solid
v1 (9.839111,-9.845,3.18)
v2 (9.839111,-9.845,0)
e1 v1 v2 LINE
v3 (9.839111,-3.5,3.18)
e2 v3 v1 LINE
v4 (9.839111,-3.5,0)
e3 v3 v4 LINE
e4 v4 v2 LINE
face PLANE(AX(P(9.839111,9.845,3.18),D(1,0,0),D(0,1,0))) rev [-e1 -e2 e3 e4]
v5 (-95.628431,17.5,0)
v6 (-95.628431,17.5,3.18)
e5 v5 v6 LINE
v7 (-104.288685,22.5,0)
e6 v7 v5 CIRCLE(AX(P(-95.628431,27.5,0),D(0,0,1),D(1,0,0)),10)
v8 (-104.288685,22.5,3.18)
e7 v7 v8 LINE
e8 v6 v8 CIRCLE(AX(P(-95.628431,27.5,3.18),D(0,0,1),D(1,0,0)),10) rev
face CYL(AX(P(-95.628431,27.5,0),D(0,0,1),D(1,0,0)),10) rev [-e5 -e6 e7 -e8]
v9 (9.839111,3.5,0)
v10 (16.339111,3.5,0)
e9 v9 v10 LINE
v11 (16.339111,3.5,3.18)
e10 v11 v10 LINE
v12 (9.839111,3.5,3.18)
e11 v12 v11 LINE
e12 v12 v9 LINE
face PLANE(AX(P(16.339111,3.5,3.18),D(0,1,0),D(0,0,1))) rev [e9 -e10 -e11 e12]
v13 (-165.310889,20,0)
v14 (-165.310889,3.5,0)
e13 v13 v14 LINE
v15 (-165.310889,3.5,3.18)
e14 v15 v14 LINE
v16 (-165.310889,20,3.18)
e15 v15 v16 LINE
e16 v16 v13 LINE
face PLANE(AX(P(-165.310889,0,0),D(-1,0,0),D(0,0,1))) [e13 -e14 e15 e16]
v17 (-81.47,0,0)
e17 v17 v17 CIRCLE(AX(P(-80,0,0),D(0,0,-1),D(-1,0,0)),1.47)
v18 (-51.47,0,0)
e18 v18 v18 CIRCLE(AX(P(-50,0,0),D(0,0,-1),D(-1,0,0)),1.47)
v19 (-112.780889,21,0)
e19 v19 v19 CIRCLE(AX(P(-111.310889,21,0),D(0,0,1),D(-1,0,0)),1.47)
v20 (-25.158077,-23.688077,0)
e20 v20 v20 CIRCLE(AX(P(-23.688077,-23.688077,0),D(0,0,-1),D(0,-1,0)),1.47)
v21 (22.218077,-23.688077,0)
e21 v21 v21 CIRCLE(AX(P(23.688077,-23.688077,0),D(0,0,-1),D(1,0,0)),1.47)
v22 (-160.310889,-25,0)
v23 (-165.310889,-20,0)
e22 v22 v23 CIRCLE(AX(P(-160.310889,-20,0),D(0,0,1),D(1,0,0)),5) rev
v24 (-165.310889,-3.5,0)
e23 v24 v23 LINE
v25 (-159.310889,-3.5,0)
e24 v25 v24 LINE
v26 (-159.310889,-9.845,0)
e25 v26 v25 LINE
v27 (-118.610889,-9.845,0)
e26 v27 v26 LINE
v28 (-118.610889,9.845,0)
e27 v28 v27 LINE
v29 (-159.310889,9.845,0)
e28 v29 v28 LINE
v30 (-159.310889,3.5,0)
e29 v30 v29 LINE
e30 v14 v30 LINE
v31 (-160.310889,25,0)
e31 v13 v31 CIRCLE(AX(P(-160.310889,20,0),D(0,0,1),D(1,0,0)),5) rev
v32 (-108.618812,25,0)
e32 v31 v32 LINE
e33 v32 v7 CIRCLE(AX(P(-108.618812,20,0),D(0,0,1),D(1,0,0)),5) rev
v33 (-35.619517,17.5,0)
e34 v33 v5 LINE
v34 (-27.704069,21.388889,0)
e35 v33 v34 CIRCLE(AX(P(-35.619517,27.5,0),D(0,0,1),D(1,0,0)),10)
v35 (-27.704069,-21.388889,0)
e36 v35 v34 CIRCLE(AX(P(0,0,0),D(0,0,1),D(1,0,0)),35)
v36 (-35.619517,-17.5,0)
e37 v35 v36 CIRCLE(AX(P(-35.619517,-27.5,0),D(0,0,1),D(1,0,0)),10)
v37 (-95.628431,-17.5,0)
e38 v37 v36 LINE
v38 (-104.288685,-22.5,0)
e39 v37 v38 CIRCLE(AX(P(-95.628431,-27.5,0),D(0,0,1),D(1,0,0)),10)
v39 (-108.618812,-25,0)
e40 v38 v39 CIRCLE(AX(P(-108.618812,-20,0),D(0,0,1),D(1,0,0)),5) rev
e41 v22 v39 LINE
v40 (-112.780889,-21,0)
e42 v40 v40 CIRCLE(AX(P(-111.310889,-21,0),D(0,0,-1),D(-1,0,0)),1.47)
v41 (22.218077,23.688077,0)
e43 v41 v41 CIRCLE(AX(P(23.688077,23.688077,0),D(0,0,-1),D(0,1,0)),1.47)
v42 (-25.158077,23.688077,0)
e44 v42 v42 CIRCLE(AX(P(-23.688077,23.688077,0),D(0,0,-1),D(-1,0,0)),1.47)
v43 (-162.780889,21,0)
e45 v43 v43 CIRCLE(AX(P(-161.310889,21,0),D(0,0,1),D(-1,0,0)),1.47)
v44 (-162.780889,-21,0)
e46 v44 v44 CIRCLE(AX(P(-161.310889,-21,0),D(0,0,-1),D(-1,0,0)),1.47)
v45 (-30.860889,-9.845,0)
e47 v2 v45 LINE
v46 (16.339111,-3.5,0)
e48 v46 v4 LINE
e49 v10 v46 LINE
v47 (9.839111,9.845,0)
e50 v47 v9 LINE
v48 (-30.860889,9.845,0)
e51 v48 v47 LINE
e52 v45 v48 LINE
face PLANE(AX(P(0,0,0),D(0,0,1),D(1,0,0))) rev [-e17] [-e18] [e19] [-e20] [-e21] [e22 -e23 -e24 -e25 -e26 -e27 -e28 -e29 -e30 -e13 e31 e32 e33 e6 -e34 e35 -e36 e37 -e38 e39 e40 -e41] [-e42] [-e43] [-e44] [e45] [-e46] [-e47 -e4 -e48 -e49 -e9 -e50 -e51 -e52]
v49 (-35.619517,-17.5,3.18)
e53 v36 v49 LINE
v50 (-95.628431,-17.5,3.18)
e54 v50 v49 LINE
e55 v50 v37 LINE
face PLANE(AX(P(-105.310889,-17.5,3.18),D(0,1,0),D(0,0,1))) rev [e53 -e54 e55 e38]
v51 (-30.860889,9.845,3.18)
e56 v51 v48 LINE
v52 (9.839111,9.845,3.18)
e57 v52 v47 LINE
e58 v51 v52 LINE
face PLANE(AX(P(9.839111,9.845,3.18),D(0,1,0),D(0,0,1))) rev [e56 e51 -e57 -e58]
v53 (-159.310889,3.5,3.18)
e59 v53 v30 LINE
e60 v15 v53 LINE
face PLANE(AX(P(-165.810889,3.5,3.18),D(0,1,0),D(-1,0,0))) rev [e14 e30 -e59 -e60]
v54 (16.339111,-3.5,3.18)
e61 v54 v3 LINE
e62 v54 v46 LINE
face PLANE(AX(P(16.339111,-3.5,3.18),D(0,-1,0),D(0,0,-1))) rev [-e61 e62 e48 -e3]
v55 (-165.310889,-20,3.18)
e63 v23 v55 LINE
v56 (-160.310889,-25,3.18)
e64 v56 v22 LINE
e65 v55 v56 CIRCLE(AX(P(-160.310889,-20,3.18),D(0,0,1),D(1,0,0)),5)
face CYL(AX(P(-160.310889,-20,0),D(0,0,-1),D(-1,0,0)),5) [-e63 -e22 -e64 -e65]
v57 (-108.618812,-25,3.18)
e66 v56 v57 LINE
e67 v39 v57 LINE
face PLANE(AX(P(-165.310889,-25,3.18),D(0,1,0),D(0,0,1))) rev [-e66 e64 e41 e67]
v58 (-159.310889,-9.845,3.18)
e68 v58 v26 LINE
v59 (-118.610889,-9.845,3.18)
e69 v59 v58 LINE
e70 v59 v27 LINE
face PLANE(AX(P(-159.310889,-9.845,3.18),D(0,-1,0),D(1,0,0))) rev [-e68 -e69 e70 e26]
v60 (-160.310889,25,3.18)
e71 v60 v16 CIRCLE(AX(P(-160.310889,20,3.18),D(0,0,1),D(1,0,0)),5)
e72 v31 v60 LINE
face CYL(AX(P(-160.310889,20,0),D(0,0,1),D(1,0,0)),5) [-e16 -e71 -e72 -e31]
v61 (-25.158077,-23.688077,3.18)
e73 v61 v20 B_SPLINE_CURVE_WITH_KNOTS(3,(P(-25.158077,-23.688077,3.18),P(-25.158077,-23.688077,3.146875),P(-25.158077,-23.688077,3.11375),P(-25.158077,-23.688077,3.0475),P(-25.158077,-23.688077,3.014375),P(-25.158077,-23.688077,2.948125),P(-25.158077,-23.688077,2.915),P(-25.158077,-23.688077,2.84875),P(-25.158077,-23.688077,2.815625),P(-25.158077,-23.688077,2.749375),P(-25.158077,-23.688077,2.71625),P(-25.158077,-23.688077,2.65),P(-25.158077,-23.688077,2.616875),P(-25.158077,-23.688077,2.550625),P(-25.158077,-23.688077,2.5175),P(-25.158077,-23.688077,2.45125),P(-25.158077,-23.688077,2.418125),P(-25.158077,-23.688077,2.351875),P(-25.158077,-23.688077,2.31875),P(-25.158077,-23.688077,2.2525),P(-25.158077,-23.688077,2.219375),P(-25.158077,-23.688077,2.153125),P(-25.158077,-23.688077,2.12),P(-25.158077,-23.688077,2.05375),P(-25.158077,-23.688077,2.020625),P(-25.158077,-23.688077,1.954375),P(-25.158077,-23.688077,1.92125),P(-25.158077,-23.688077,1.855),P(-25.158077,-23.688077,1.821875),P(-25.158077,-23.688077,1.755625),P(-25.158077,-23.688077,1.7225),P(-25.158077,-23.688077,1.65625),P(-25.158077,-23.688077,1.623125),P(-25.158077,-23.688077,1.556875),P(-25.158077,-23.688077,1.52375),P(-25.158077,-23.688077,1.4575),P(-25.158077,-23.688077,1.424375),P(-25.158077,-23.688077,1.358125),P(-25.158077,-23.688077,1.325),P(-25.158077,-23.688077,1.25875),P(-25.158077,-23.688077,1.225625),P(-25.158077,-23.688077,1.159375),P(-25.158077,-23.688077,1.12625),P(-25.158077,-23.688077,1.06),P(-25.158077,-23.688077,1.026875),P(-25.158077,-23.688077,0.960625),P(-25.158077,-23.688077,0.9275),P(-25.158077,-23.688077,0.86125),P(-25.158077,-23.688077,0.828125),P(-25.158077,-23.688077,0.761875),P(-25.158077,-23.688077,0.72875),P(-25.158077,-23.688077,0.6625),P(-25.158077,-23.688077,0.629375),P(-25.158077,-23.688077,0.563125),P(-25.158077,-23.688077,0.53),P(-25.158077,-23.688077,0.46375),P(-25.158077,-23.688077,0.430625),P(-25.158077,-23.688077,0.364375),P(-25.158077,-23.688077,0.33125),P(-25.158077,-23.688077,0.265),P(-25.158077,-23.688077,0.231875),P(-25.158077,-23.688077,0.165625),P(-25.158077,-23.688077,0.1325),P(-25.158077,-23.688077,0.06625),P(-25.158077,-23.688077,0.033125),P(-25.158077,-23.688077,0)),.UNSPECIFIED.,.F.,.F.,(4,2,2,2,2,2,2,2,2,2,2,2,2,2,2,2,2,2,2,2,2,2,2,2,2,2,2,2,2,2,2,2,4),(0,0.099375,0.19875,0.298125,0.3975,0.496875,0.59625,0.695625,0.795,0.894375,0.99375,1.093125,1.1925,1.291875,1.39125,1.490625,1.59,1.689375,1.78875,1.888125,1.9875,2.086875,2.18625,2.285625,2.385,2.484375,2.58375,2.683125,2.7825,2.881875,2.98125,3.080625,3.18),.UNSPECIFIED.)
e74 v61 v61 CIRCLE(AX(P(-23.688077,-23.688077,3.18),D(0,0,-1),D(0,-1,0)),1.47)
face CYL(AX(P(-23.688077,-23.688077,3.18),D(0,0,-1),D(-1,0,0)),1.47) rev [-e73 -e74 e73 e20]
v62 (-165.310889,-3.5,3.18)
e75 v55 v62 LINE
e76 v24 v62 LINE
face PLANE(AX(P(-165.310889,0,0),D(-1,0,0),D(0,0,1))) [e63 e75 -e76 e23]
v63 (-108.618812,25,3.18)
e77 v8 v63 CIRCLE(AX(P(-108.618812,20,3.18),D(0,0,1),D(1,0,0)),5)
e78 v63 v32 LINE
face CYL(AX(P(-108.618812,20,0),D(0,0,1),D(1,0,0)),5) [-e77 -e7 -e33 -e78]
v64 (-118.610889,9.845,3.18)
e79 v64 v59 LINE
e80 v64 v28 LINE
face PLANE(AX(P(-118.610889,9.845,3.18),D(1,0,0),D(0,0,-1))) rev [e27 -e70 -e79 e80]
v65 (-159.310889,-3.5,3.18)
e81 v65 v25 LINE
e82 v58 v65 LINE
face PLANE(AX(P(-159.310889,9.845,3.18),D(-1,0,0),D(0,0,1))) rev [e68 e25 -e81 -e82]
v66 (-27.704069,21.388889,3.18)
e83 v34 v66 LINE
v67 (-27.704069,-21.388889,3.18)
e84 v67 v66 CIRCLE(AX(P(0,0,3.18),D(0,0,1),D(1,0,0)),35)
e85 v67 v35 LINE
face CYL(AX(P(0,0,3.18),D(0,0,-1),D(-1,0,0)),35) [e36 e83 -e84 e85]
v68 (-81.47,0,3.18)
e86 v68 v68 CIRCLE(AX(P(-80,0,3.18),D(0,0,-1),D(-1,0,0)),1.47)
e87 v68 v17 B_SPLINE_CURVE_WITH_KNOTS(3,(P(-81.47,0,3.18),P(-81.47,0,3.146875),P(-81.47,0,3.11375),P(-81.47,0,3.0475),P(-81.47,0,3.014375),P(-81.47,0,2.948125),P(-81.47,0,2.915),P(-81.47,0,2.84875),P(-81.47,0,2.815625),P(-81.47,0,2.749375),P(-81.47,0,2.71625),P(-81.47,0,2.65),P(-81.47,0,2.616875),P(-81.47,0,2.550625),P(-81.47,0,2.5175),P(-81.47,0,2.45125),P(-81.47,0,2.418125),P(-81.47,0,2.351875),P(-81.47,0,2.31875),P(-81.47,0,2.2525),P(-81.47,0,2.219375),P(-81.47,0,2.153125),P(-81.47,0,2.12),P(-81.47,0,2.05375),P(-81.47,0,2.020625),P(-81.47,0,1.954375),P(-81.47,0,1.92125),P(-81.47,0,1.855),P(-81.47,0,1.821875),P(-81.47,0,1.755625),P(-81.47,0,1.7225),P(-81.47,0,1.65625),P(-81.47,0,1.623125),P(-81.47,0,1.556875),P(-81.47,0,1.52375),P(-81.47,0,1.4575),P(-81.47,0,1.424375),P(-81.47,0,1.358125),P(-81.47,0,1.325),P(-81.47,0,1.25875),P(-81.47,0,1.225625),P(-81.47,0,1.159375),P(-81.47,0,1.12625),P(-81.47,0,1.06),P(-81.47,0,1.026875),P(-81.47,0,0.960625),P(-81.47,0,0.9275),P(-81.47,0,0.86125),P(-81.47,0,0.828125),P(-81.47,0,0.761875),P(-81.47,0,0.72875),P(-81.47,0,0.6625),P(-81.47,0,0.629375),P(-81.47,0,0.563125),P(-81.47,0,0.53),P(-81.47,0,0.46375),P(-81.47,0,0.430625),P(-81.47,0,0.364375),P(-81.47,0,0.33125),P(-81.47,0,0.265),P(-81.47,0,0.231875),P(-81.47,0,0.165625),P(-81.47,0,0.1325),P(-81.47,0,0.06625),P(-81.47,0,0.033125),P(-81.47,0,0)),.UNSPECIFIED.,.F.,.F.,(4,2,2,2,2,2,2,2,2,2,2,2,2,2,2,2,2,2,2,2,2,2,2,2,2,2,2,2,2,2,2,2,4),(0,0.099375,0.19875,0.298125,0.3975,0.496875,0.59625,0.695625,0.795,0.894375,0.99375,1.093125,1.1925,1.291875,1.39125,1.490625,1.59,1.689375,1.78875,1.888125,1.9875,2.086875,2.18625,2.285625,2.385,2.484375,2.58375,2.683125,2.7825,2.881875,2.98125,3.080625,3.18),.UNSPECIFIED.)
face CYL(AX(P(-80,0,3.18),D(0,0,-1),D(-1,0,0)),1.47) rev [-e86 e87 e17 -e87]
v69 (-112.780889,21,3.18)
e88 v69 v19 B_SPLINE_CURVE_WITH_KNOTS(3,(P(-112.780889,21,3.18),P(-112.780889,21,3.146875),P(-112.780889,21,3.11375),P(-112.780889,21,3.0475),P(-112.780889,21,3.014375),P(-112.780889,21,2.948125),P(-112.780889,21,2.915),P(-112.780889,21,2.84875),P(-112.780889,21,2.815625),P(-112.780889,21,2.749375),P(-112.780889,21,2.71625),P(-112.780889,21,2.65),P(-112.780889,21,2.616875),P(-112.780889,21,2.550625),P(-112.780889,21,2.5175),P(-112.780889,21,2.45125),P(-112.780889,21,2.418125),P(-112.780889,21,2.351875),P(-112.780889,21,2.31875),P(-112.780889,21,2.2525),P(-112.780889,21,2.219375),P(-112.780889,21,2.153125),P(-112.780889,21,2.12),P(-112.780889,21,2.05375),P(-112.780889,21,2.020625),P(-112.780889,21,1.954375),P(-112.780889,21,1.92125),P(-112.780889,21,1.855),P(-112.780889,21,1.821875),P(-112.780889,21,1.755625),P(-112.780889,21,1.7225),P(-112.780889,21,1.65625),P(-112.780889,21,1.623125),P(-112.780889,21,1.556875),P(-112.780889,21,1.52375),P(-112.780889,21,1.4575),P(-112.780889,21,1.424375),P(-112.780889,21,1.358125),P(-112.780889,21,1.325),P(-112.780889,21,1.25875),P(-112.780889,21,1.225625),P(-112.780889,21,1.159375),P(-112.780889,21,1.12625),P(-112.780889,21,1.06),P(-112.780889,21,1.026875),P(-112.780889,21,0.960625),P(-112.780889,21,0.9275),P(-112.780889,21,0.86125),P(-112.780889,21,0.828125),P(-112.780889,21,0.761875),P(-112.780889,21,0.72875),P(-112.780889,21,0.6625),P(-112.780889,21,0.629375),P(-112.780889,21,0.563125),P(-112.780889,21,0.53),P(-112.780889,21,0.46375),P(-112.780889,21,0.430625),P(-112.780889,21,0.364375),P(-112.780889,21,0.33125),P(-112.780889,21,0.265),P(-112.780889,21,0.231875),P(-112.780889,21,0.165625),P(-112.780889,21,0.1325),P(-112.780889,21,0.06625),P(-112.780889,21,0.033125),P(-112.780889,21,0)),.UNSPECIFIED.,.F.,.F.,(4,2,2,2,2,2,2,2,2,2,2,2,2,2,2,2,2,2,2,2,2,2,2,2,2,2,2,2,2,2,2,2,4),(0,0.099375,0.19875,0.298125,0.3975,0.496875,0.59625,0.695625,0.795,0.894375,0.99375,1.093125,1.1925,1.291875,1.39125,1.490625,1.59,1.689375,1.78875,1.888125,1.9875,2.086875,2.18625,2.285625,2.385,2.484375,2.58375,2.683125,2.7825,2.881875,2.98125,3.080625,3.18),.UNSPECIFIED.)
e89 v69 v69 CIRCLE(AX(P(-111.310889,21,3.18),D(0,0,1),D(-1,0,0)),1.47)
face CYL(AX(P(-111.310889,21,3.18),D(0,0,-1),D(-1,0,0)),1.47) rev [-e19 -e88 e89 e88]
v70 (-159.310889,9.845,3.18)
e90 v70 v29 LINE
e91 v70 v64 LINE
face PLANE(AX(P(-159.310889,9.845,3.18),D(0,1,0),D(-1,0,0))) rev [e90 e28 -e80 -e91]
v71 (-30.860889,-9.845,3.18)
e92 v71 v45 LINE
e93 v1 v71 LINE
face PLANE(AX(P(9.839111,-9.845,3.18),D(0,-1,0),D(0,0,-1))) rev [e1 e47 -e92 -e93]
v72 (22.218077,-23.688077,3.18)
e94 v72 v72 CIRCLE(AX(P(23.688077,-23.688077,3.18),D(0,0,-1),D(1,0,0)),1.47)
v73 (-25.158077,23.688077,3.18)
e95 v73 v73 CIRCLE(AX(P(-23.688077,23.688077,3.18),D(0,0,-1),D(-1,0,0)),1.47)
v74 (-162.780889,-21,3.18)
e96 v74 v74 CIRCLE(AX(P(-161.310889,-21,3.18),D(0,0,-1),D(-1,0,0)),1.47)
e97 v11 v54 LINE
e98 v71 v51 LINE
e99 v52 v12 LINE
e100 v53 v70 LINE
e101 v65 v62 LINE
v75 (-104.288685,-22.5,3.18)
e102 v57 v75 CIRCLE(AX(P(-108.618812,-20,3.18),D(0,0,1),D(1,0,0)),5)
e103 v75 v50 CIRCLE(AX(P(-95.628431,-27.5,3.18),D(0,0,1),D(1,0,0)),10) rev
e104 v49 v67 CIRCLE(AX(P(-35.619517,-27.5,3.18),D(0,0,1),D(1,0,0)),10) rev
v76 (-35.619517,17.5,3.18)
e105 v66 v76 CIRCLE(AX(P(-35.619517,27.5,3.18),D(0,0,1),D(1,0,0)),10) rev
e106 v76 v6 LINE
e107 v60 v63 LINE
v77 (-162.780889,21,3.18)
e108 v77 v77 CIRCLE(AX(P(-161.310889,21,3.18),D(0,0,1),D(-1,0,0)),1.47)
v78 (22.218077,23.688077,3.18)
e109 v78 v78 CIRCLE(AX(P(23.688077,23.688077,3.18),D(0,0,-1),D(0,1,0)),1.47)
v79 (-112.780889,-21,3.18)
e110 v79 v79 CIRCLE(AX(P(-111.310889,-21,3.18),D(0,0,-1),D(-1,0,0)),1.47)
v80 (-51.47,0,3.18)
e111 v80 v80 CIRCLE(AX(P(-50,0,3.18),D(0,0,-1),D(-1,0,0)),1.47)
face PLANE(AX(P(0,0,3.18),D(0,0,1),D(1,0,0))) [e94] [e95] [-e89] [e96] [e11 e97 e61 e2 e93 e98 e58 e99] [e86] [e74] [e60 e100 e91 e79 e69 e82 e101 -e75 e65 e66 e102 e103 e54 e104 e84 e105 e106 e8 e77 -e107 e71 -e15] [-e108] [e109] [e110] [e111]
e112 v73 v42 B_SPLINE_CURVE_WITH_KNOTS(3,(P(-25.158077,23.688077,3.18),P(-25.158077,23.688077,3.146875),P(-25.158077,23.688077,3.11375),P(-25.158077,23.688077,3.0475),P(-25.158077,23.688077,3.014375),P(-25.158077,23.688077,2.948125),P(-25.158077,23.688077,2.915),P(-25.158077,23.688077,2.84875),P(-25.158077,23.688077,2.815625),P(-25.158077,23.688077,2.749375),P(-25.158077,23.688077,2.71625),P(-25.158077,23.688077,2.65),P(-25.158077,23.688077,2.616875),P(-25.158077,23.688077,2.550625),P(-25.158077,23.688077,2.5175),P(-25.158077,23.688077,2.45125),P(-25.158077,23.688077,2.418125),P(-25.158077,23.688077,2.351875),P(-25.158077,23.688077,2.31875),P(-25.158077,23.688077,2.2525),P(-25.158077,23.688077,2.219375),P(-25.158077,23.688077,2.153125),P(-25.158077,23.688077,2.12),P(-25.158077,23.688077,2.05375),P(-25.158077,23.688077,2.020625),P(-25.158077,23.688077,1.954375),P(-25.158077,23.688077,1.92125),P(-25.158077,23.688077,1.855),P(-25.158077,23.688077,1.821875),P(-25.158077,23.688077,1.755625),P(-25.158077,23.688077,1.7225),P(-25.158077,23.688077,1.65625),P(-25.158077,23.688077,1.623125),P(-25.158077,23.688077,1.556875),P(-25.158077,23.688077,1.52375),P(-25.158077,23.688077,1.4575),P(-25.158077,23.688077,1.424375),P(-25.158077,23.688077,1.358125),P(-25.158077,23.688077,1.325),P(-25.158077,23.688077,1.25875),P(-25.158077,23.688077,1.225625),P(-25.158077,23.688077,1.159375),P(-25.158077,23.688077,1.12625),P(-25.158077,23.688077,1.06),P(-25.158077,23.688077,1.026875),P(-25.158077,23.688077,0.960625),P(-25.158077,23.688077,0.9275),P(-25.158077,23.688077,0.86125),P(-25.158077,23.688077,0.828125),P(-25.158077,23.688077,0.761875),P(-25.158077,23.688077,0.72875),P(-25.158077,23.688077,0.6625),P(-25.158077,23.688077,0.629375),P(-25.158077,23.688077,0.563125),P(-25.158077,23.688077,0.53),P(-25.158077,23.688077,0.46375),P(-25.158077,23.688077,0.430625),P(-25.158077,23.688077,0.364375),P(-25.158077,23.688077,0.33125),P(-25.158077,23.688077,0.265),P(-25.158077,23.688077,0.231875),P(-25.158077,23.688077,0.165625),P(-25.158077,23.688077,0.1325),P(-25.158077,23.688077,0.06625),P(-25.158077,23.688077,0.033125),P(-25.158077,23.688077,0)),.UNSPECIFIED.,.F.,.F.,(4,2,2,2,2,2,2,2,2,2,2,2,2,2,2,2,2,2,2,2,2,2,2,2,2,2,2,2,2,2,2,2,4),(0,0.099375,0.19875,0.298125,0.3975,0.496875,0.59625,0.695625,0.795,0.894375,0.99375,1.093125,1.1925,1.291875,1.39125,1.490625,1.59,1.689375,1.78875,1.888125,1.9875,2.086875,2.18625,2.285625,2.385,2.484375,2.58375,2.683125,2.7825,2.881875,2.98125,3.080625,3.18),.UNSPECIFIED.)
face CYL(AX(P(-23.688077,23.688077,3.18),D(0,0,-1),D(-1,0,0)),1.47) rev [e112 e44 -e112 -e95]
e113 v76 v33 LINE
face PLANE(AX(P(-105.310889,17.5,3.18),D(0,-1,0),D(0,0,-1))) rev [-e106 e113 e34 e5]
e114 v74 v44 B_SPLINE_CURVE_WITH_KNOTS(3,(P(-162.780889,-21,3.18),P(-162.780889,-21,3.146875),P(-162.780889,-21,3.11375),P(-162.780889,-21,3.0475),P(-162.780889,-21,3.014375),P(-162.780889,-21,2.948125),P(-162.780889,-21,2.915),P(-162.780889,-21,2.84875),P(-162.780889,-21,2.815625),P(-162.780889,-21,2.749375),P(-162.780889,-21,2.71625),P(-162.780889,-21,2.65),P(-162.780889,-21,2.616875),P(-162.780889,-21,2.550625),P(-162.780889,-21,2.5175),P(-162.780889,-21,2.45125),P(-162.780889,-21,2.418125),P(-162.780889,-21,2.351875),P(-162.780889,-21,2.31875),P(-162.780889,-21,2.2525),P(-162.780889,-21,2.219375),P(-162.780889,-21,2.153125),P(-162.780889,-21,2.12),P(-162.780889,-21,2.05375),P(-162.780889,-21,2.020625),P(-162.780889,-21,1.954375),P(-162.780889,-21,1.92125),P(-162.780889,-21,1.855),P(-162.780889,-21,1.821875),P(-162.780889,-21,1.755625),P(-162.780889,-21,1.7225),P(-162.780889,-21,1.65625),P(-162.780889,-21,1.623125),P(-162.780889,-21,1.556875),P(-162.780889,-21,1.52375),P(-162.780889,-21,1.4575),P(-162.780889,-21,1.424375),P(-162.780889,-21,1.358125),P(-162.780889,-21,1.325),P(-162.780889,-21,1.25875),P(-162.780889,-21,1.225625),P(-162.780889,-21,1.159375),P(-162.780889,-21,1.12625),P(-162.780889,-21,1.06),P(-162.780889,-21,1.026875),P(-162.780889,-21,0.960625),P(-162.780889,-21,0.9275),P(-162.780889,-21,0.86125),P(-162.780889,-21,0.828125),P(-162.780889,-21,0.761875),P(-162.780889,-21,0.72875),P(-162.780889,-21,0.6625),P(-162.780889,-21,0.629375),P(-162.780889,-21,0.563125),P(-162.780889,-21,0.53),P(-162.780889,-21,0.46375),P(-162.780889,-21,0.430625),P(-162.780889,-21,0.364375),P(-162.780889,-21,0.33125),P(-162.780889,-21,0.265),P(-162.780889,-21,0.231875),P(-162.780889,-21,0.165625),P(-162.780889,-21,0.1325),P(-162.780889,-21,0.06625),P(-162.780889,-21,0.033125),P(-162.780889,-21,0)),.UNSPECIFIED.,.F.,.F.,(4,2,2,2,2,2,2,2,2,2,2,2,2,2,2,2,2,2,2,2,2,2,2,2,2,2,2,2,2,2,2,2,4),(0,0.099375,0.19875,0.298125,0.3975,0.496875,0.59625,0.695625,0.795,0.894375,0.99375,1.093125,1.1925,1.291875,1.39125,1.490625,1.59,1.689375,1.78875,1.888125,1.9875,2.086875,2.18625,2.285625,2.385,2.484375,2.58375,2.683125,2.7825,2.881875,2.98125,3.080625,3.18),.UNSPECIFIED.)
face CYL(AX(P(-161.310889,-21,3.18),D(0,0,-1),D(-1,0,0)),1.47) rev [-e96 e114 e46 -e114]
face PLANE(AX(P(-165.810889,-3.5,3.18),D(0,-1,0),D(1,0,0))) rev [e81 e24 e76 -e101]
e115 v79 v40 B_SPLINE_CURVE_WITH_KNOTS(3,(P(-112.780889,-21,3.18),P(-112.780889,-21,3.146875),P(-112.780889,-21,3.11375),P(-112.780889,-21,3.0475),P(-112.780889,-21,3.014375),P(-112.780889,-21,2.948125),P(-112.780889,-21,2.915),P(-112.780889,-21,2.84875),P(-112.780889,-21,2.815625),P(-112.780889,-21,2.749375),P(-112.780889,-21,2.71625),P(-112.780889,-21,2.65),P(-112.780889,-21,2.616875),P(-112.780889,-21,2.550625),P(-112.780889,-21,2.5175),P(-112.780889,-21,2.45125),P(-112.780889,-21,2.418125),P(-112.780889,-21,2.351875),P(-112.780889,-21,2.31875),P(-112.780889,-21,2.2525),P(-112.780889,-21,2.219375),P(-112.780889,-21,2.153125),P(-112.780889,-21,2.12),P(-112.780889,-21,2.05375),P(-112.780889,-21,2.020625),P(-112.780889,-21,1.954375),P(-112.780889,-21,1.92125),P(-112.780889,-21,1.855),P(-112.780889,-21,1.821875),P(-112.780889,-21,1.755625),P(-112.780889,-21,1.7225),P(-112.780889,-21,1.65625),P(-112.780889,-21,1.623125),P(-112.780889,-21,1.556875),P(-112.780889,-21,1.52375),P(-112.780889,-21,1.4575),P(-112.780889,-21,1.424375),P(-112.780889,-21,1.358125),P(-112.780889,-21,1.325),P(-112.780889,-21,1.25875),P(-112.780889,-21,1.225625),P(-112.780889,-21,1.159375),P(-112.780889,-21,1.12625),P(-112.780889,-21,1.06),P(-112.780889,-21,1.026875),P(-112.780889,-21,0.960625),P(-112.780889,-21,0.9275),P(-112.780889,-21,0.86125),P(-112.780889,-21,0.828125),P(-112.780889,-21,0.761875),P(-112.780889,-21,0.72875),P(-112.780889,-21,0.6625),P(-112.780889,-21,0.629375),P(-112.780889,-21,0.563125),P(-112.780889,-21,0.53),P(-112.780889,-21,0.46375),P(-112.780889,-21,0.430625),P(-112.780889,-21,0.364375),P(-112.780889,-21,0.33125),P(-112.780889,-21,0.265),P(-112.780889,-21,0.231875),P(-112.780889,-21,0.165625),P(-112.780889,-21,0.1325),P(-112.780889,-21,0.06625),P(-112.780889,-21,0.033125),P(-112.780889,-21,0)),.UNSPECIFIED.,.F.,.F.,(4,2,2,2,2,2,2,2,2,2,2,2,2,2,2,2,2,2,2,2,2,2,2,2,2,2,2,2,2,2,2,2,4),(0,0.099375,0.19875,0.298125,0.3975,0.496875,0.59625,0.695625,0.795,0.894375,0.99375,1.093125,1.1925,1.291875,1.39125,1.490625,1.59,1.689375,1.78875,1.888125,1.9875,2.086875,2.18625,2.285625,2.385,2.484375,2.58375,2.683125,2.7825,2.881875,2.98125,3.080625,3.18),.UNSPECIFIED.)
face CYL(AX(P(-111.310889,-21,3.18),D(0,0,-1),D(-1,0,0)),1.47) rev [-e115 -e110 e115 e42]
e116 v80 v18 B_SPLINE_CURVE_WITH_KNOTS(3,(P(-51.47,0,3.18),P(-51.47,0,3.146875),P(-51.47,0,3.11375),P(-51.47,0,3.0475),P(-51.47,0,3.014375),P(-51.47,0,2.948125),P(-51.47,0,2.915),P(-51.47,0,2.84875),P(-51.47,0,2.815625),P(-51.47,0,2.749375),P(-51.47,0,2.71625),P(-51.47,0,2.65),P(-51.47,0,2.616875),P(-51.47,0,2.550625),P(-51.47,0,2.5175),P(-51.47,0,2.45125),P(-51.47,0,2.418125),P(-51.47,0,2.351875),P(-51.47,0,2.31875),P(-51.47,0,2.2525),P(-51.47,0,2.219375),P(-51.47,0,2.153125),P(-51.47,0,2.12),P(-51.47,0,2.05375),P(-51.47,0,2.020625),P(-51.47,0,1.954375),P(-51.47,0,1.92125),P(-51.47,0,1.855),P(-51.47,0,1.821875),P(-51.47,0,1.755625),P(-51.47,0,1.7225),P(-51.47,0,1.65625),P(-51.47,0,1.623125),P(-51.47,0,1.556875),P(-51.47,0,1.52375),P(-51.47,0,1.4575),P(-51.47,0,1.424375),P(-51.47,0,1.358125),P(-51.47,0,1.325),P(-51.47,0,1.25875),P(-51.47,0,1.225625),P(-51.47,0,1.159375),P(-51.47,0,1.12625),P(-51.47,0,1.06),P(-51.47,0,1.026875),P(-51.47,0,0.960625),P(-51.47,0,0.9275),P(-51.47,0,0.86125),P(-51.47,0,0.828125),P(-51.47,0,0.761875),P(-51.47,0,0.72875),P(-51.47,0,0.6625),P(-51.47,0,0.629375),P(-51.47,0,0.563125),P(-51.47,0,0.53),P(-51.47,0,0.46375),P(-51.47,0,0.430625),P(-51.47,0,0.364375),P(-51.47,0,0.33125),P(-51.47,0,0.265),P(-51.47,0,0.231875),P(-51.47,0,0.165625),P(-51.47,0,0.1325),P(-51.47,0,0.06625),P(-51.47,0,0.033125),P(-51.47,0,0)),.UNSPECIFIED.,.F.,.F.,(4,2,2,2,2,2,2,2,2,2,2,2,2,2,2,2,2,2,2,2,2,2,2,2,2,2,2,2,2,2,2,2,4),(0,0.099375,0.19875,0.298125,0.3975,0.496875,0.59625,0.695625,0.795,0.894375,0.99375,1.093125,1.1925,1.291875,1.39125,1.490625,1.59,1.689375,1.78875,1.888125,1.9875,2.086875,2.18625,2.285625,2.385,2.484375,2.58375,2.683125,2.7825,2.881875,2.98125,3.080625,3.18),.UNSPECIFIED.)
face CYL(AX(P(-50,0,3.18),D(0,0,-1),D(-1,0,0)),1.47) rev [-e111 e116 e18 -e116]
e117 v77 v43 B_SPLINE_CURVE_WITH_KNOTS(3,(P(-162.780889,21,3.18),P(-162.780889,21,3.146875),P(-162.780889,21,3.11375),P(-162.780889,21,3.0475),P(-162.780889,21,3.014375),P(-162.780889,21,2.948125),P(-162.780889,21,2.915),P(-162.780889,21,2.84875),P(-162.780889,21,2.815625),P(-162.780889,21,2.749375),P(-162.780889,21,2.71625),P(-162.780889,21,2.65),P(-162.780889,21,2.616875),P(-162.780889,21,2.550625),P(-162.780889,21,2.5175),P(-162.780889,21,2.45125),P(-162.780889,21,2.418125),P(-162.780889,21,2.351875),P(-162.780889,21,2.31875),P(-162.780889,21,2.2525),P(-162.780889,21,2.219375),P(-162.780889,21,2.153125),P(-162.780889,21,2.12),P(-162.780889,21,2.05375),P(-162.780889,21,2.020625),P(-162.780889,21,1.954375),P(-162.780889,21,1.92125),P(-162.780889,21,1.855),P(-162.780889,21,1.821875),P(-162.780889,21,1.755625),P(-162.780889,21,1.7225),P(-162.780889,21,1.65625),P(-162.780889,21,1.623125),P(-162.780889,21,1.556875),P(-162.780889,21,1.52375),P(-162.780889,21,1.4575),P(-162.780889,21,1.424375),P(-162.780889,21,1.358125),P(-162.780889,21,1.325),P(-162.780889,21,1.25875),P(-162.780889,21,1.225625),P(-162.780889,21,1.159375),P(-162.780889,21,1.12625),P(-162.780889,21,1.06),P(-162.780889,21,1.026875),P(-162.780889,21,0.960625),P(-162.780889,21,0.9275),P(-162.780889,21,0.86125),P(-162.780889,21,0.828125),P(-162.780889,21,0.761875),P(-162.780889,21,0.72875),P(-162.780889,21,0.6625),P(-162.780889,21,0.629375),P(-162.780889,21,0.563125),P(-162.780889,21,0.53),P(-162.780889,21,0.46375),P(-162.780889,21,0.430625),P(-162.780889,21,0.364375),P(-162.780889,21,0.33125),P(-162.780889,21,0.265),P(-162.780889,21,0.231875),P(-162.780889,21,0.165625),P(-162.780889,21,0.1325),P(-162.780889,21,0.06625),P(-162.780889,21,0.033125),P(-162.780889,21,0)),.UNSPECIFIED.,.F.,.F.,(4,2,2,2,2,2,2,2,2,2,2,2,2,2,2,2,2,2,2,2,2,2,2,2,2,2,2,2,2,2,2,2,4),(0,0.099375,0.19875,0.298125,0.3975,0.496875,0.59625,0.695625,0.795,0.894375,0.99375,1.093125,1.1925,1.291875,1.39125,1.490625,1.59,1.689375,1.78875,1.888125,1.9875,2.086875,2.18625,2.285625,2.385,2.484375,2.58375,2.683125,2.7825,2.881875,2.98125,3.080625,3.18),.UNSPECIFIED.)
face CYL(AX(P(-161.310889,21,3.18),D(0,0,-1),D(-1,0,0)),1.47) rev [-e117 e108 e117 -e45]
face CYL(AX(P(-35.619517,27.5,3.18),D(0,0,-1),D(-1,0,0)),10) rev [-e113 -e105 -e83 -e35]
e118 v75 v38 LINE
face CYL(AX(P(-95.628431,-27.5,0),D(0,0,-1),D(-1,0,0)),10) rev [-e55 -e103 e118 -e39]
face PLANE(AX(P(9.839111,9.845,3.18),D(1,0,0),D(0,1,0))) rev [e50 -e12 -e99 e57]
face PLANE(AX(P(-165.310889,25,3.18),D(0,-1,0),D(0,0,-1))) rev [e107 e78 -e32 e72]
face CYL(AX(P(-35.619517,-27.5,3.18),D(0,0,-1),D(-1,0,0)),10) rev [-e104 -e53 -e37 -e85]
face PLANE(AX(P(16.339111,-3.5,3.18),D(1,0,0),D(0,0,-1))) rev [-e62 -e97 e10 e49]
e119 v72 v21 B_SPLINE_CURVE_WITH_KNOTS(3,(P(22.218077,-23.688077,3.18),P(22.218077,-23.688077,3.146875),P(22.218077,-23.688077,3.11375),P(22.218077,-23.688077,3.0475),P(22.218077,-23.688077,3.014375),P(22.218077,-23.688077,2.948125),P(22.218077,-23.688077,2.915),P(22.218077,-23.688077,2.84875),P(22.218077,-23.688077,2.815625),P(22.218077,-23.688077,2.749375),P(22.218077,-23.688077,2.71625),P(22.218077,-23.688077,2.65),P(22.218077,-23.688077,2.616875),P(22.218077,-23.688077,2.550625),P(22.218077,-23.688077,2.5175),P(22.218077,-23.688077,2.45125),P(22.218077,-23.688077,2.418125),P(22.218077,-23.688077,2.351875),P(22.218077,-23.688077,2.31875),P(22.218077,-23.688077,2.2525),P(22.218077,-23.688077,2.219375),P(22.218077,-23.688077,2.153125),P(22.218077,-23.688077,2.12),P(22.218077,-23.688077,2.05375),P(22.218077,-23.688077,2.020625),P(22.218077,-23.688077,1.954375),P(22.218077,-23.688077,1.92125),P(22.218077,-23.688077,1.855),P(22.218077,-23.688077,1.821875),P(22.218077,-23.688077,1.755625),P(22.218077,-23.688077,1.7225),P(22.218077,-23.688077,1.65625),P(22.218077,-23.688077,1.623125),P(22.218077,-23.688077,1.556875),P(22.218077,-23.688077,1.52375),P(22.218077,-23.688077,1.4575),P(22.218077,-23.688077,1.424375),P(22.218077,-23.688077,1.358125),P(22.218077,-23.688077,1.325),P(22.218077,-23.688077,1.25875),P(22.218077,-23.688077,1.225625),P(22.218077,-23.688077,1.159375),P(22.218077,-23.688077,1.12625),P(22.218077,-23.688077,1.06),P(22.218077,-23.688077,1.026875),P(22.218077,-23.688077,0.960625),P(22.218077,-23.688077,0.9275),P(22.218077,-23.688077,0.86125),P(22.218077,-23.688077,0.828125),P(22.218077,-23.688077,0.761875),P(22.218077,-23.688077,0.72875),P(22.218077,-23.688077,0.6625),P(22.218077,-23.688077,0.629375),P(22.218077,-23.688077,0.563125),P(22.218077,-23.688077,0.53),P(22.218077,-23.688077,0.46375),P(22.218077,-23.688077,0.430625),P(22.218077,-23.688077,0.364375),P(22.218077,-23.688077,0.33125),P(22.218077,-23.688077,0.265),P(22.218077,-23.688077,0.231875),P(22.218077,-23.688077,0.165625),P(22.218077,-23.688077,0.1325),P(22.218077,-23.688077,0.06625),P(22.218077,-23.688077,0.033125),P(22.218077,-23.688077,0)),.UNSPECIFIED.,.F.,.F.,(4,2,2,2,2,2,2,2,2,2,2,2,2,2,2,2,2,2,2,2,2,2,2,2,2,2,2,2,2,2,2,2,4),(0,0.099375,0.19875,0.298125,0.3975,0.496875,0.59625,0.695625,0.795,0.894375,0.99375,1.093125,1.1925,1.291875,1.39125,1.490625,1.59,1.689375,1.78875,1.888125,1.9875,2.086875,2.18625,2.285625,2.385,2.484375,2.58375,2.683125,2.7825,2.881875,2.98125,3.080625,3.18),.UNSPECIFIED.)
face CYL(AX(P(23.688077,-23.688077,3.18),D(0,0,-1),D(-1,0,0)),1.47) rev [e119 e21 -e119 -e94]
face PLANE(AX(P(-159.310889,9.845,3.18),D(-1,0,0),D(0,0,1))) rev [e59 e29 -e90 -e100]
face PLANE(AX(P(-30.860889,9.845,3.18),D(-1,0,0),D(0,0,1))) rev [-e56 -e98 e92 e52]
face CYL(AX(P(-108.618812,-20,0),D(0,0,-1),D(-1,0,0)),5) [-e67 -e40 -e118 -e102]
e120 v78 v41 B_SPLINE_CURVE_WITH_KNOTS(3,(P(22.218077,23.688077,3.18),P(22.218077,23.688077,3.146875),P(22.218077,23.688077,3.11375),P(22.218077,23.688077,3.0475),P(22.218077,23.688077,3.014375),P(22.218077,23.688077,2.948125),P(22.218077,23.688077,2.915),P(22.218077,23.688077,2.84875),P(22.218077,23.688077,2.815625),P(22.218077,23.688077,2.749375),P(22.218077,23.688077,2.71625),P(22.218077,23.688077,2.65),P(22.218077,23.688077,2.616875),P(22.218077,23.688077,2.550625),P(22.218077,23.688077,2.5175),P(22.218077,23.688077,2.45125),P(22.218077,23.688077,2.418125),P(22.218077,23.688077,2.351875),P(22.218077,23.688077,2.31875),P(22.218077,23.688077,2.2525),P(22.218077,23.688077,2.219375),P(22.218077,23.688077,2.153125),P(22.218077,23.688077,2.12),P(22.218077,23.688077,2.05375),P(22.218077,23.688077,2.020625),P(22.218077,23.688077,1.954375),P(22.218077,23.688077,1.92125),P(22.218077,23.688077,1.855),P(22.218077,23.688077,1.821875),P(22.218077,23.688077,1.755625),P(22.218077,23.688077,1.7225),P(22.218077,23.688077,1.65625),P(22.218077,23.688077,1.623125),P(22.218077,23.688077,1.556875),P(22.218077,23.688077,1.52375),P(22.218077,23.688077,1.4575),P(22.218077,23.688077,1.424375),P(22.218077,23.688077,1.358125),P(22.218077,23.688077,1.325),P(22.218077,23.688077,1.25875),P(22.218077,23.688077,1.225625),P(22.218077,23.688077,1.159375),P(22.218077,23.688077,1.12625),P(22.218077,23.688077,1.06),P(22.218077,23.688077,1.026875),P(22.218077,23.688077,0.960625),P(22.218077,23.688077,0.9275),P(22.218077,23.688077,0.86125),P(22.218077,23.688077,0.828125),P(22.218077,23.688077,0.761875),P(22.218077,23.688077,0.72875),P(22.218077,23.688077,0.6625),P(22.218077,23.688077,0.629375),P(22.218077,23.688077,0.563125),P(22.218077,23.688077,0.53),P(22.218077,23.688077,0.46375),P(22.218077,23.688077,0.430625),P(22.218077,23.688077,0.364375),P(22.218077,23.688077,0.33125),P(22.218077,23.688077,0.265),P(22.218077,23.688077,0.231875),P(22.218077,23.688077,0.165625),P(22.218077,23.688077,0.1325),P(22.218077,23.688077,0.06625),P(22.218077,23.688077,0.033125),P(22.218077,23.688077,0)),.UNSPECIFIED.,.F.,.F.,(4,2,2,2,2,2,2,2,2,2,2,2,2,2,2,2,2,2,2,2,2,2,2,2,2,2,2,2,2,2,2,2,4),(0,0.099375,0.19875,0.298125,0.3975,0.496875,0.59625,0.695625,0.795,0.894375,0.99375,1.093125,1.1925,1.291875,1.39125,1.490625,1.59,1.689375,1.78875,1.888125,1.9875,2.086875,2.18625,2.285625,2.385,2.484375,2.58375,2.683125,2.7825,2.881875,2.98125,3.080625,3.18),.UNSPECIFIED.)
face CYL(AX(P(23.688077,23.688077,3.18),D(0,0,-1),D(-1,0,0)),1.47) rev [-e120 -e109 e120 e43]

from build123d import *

# Parameters (mm, degrees)
BOSS_EXTRUDE1_DEPTH = 3.18
FILLET1_R           = 10
SKETCH2_W           = 3.18
SKETCH2_H           = 50
BOSS_EXTRUDE2_DEPTH = 60
FILLET3_R           = 10
FILLET4_R           = 5
SKETCH3_W           = 40.7
SKETCH3_H           = 19.69
CUT_EXTRUDE1_DEPTH  = 170.005332655
SKETCH4_W           = 40.7
SKETCH4_H           = 19.69
CUT_EXTRUDE2_DEPTH  = 3.18
SKETCH5_R           = 1.47
CUT_EXTRUDE3_DEPTH  = 3.18
CIRPATTERN1_COUNT   = 4
SKETCH6_R           = 1.47
CUT_EXTRUDE4_DEPTH  = 3.18
SKETCH8_R           = 1.47
CUT_EXTRUDE6_DEPTH  = 3.18
SKETCH10_W          = 6.5
SKETCH10_H          = 7
CUT_EXTRUDE8_DEPTH  = 3.18
SKETCH11_W          = 6.5
SKETCH11_H          = 7
CUT_EXTRUDE9_DEPTH  = 3.18


with BuildPart() as part:
    # Sketch1 → Boss-Extrude1 (new body)
    with BuildSketch(Plane.XY):
        with BuildLine():
            Line((-105.310889132, 17.5), (-30.310889132, 17.5))
            ThreePointArc((-30.310889132, 17.5), (35, 0), (-30.310889132, -17.5))
            Line((-30.310889132, -17.5), (-105.310889132, -17.5))
            Line((-105.310889132, -17.5), (-105.310889132, 17.5))
        make_face()
    extrude(amount=BOSS_EXTRUDE1_DEPTH)

    # Fillet1
    fillet1_edges = [part.edges().sort_by_distance(p)[0] for p in [
        (-30.310889132, -17.5, 1.59),
        (-30.310889132, 17.5, 1.59),
    ]]
    fillet(fillet1_edges, radius=FILLET1_R)

    # Sketch2 → Boss-Extrude2 (add)
    with BuildSketch(Plane.ZY.offset(105.310889132)):
        with Locations((1.59, 0)):
            Rectangle(SKETCH2_W, SKETCH2_H)
    extrude(amount=BOSS_EXTRUDE2_DEPTH)

    # Fillet3
    # the kernel refuses this fillet: 10 mm, written as the material it adds along each edge
    with BuildSketch(Plane(origin=(-105.310889132, -17.5, 0), x_dir=(0, -1, 0), z_dir=(0, 0, 1))) as fillet3_piece_1:
        with BuildLine():
            CenterArc((10, 9.682458366), FILLET3_R, 180, 75.522487814)
            Line((0, 9.682458366), (-0.2, 9.682458366))
            Line((-0.2, 9.682458366), (-0.2, 0))
            Line((-0.2, 0), (0, -0.2))
            ThreePointArc((0, -0.2), (3.75, -0.2), (7.45, -0.193649167))
            Line((7.45, -0.193649167), (7.5, 0))
        make_face()
    extrude(amount=3.18)
    with BuildSketch(Plane(origin=(-105.310889132, 17.5, 0), x_dir=(0, 1, 0), z_dir=(0, 0, 1))) as fillet3_piece_2:
        with BuildLine():
            CenterArc((10, -9.682458366), FILLET3_R, 104.477512186, 75.522487814)
            Line((0, -9.682458366), (-0.2, -9.682458366))
            Line((-0.2, -9.682458366), (-0.2, 0))
            Line((-0.2, 0), (0, 0.2))
            ThreePointArc((0, 0.2), (3.75, 0.2), (7.45, 0.193649167))
            Line((7.45, 0.193649167), (7.5, 0))
        make_face()
    extrude(amount=3.18)

    # Fillet4
    fillet4_edges = [part.edges().sort_by_distance(p)[0] for p in [
        (-105.310889132, -25, 1.59),
        (-105.310889132, 25, 1.59),
        (-165.310889132, -25, 1.59),
        (-165.310889132, 25, 1.59),
    ]]
    fillet(fillet4_edges, radius=FILLET4_R)

    # Sketch3 → Cut-Extrude1 (cut, through all)
    with BuildSketch(Plane(origin=(0, 0, 0), x_dir=(-1, 0, 0), z_dir=(0, 0, -1))):
        with Locations((10.510889132, 0)):
            Rectangle(SKETCH3_W, SKETCH3_H)
    extrude(amount=-CUT_EXTRUDE1_DEPTH, mode=Mode.SUBTRACT)

    # Sketch4 → Cut-Extrude2 (cut)
    with BuildSketch(Plane(origin=(0, 0, 0), x_dir=(-1, 0, 0), z_dir=(0, 0, -1))):
        with Locations((138.960889132, 0)):
            Rectangle(SKETCH4_W, SKETCH4_H)
    extrude(amount=-CUT_EXTRUDE2_DEPTH, mode=Mode.SUBTRACT)

    # Sketch5 → Cut-Extrude3 (cut)
    with BuildSketch(Plane(origin=(0, 0, 0), x_dir=(-1, 0, 0), z_dir=(0, 0, -1))):
        with Locations((23.68807717, 23.68807717)):
            Circle(SKETCH5_R)
    cut_extrude3 = extrude(amount=-CUT_EXTRUDE3_DEPTH, mode=Mode.SUBTRACT)

    # CirPattern1: Cut-Extrude3 ×4 about axis
    cirpattern1_axis = Axis((0, 0, 0), (0, 0, 1))
    for i in range(1, CIRPATTERN1_COUNT):
        add(cut_extrude3.rotate(cirpattern1_axis, i * 360 / CIRPATTERN1_COUNT), mode=Mode.SUBTRACT)

    # Sketch6 → Cut-Extrude4 (cut)
    with BuildSketch(Plane(origin=(0, 0, 0), x_dir=(-1, 0, 0), z_dir=(0, 0, -1))):
        with Locations((161.310889132, -21)):
            Circle(SKETCH6_R)
        with Locations((111.310889132, -21)):
            Circle(SKETCH6_R)
    cut_extrude4 = extrude(amount=-CUT_EXTRUDE4_DEPTH, mode=Mode.SUBTRACT)

    # Mirror1: Cut-Extrude4 across plane
    add(cut_extrude4.mirror(Plane.ZX), mode=Mode.SUBTRACT)

    # Sketch8 → Cut-Extrude6 (cut)
    with BuildSketch(Plane(origin=(0, 0, 0), x_dir=(-1, 0, 0), z_dir=(0, 0, -1))):
        with Locations((80, 0)):
            Circle(SKETCH8_R)
        with Locations((50, 0)):
            Circle(SKETCH8_R)
    extrude(amount=-CUT_EXTRUDE6_DEPTH, mode=Mode.SUBTRACT)

    # Sketch10 → Cut-Extrude8 (cut)
    with BuildSketch(Plane(origin=(0, 0, 0), x_dir=(-1, 0, 0), z_dir=(0, 0, -1))):
        with Locations((162.560889132, 0)):
            Rectangle(SKETCH10_W, SKETCH10_H)
    extrude(amount=-CUT_EXTRUDE8_DEPTH, mode=Mode.SUBTRACT)

    # Sketch11 → Cut-Extrude9 (cut)
    with BuildSketch(Plane(origin=(0, 0, 0), x_dir=(-1, 0, 0), z_dir=(0, 0, -1))):
        with Locations((-13.089110868, 0)):
            Rectangle(SKETCH11_W, SKETCH11_H)
    extrude(amount=-CUT_EXTRUDE9_DEPTH, mode=Mode.SUBTRACT)


solid = part.part
